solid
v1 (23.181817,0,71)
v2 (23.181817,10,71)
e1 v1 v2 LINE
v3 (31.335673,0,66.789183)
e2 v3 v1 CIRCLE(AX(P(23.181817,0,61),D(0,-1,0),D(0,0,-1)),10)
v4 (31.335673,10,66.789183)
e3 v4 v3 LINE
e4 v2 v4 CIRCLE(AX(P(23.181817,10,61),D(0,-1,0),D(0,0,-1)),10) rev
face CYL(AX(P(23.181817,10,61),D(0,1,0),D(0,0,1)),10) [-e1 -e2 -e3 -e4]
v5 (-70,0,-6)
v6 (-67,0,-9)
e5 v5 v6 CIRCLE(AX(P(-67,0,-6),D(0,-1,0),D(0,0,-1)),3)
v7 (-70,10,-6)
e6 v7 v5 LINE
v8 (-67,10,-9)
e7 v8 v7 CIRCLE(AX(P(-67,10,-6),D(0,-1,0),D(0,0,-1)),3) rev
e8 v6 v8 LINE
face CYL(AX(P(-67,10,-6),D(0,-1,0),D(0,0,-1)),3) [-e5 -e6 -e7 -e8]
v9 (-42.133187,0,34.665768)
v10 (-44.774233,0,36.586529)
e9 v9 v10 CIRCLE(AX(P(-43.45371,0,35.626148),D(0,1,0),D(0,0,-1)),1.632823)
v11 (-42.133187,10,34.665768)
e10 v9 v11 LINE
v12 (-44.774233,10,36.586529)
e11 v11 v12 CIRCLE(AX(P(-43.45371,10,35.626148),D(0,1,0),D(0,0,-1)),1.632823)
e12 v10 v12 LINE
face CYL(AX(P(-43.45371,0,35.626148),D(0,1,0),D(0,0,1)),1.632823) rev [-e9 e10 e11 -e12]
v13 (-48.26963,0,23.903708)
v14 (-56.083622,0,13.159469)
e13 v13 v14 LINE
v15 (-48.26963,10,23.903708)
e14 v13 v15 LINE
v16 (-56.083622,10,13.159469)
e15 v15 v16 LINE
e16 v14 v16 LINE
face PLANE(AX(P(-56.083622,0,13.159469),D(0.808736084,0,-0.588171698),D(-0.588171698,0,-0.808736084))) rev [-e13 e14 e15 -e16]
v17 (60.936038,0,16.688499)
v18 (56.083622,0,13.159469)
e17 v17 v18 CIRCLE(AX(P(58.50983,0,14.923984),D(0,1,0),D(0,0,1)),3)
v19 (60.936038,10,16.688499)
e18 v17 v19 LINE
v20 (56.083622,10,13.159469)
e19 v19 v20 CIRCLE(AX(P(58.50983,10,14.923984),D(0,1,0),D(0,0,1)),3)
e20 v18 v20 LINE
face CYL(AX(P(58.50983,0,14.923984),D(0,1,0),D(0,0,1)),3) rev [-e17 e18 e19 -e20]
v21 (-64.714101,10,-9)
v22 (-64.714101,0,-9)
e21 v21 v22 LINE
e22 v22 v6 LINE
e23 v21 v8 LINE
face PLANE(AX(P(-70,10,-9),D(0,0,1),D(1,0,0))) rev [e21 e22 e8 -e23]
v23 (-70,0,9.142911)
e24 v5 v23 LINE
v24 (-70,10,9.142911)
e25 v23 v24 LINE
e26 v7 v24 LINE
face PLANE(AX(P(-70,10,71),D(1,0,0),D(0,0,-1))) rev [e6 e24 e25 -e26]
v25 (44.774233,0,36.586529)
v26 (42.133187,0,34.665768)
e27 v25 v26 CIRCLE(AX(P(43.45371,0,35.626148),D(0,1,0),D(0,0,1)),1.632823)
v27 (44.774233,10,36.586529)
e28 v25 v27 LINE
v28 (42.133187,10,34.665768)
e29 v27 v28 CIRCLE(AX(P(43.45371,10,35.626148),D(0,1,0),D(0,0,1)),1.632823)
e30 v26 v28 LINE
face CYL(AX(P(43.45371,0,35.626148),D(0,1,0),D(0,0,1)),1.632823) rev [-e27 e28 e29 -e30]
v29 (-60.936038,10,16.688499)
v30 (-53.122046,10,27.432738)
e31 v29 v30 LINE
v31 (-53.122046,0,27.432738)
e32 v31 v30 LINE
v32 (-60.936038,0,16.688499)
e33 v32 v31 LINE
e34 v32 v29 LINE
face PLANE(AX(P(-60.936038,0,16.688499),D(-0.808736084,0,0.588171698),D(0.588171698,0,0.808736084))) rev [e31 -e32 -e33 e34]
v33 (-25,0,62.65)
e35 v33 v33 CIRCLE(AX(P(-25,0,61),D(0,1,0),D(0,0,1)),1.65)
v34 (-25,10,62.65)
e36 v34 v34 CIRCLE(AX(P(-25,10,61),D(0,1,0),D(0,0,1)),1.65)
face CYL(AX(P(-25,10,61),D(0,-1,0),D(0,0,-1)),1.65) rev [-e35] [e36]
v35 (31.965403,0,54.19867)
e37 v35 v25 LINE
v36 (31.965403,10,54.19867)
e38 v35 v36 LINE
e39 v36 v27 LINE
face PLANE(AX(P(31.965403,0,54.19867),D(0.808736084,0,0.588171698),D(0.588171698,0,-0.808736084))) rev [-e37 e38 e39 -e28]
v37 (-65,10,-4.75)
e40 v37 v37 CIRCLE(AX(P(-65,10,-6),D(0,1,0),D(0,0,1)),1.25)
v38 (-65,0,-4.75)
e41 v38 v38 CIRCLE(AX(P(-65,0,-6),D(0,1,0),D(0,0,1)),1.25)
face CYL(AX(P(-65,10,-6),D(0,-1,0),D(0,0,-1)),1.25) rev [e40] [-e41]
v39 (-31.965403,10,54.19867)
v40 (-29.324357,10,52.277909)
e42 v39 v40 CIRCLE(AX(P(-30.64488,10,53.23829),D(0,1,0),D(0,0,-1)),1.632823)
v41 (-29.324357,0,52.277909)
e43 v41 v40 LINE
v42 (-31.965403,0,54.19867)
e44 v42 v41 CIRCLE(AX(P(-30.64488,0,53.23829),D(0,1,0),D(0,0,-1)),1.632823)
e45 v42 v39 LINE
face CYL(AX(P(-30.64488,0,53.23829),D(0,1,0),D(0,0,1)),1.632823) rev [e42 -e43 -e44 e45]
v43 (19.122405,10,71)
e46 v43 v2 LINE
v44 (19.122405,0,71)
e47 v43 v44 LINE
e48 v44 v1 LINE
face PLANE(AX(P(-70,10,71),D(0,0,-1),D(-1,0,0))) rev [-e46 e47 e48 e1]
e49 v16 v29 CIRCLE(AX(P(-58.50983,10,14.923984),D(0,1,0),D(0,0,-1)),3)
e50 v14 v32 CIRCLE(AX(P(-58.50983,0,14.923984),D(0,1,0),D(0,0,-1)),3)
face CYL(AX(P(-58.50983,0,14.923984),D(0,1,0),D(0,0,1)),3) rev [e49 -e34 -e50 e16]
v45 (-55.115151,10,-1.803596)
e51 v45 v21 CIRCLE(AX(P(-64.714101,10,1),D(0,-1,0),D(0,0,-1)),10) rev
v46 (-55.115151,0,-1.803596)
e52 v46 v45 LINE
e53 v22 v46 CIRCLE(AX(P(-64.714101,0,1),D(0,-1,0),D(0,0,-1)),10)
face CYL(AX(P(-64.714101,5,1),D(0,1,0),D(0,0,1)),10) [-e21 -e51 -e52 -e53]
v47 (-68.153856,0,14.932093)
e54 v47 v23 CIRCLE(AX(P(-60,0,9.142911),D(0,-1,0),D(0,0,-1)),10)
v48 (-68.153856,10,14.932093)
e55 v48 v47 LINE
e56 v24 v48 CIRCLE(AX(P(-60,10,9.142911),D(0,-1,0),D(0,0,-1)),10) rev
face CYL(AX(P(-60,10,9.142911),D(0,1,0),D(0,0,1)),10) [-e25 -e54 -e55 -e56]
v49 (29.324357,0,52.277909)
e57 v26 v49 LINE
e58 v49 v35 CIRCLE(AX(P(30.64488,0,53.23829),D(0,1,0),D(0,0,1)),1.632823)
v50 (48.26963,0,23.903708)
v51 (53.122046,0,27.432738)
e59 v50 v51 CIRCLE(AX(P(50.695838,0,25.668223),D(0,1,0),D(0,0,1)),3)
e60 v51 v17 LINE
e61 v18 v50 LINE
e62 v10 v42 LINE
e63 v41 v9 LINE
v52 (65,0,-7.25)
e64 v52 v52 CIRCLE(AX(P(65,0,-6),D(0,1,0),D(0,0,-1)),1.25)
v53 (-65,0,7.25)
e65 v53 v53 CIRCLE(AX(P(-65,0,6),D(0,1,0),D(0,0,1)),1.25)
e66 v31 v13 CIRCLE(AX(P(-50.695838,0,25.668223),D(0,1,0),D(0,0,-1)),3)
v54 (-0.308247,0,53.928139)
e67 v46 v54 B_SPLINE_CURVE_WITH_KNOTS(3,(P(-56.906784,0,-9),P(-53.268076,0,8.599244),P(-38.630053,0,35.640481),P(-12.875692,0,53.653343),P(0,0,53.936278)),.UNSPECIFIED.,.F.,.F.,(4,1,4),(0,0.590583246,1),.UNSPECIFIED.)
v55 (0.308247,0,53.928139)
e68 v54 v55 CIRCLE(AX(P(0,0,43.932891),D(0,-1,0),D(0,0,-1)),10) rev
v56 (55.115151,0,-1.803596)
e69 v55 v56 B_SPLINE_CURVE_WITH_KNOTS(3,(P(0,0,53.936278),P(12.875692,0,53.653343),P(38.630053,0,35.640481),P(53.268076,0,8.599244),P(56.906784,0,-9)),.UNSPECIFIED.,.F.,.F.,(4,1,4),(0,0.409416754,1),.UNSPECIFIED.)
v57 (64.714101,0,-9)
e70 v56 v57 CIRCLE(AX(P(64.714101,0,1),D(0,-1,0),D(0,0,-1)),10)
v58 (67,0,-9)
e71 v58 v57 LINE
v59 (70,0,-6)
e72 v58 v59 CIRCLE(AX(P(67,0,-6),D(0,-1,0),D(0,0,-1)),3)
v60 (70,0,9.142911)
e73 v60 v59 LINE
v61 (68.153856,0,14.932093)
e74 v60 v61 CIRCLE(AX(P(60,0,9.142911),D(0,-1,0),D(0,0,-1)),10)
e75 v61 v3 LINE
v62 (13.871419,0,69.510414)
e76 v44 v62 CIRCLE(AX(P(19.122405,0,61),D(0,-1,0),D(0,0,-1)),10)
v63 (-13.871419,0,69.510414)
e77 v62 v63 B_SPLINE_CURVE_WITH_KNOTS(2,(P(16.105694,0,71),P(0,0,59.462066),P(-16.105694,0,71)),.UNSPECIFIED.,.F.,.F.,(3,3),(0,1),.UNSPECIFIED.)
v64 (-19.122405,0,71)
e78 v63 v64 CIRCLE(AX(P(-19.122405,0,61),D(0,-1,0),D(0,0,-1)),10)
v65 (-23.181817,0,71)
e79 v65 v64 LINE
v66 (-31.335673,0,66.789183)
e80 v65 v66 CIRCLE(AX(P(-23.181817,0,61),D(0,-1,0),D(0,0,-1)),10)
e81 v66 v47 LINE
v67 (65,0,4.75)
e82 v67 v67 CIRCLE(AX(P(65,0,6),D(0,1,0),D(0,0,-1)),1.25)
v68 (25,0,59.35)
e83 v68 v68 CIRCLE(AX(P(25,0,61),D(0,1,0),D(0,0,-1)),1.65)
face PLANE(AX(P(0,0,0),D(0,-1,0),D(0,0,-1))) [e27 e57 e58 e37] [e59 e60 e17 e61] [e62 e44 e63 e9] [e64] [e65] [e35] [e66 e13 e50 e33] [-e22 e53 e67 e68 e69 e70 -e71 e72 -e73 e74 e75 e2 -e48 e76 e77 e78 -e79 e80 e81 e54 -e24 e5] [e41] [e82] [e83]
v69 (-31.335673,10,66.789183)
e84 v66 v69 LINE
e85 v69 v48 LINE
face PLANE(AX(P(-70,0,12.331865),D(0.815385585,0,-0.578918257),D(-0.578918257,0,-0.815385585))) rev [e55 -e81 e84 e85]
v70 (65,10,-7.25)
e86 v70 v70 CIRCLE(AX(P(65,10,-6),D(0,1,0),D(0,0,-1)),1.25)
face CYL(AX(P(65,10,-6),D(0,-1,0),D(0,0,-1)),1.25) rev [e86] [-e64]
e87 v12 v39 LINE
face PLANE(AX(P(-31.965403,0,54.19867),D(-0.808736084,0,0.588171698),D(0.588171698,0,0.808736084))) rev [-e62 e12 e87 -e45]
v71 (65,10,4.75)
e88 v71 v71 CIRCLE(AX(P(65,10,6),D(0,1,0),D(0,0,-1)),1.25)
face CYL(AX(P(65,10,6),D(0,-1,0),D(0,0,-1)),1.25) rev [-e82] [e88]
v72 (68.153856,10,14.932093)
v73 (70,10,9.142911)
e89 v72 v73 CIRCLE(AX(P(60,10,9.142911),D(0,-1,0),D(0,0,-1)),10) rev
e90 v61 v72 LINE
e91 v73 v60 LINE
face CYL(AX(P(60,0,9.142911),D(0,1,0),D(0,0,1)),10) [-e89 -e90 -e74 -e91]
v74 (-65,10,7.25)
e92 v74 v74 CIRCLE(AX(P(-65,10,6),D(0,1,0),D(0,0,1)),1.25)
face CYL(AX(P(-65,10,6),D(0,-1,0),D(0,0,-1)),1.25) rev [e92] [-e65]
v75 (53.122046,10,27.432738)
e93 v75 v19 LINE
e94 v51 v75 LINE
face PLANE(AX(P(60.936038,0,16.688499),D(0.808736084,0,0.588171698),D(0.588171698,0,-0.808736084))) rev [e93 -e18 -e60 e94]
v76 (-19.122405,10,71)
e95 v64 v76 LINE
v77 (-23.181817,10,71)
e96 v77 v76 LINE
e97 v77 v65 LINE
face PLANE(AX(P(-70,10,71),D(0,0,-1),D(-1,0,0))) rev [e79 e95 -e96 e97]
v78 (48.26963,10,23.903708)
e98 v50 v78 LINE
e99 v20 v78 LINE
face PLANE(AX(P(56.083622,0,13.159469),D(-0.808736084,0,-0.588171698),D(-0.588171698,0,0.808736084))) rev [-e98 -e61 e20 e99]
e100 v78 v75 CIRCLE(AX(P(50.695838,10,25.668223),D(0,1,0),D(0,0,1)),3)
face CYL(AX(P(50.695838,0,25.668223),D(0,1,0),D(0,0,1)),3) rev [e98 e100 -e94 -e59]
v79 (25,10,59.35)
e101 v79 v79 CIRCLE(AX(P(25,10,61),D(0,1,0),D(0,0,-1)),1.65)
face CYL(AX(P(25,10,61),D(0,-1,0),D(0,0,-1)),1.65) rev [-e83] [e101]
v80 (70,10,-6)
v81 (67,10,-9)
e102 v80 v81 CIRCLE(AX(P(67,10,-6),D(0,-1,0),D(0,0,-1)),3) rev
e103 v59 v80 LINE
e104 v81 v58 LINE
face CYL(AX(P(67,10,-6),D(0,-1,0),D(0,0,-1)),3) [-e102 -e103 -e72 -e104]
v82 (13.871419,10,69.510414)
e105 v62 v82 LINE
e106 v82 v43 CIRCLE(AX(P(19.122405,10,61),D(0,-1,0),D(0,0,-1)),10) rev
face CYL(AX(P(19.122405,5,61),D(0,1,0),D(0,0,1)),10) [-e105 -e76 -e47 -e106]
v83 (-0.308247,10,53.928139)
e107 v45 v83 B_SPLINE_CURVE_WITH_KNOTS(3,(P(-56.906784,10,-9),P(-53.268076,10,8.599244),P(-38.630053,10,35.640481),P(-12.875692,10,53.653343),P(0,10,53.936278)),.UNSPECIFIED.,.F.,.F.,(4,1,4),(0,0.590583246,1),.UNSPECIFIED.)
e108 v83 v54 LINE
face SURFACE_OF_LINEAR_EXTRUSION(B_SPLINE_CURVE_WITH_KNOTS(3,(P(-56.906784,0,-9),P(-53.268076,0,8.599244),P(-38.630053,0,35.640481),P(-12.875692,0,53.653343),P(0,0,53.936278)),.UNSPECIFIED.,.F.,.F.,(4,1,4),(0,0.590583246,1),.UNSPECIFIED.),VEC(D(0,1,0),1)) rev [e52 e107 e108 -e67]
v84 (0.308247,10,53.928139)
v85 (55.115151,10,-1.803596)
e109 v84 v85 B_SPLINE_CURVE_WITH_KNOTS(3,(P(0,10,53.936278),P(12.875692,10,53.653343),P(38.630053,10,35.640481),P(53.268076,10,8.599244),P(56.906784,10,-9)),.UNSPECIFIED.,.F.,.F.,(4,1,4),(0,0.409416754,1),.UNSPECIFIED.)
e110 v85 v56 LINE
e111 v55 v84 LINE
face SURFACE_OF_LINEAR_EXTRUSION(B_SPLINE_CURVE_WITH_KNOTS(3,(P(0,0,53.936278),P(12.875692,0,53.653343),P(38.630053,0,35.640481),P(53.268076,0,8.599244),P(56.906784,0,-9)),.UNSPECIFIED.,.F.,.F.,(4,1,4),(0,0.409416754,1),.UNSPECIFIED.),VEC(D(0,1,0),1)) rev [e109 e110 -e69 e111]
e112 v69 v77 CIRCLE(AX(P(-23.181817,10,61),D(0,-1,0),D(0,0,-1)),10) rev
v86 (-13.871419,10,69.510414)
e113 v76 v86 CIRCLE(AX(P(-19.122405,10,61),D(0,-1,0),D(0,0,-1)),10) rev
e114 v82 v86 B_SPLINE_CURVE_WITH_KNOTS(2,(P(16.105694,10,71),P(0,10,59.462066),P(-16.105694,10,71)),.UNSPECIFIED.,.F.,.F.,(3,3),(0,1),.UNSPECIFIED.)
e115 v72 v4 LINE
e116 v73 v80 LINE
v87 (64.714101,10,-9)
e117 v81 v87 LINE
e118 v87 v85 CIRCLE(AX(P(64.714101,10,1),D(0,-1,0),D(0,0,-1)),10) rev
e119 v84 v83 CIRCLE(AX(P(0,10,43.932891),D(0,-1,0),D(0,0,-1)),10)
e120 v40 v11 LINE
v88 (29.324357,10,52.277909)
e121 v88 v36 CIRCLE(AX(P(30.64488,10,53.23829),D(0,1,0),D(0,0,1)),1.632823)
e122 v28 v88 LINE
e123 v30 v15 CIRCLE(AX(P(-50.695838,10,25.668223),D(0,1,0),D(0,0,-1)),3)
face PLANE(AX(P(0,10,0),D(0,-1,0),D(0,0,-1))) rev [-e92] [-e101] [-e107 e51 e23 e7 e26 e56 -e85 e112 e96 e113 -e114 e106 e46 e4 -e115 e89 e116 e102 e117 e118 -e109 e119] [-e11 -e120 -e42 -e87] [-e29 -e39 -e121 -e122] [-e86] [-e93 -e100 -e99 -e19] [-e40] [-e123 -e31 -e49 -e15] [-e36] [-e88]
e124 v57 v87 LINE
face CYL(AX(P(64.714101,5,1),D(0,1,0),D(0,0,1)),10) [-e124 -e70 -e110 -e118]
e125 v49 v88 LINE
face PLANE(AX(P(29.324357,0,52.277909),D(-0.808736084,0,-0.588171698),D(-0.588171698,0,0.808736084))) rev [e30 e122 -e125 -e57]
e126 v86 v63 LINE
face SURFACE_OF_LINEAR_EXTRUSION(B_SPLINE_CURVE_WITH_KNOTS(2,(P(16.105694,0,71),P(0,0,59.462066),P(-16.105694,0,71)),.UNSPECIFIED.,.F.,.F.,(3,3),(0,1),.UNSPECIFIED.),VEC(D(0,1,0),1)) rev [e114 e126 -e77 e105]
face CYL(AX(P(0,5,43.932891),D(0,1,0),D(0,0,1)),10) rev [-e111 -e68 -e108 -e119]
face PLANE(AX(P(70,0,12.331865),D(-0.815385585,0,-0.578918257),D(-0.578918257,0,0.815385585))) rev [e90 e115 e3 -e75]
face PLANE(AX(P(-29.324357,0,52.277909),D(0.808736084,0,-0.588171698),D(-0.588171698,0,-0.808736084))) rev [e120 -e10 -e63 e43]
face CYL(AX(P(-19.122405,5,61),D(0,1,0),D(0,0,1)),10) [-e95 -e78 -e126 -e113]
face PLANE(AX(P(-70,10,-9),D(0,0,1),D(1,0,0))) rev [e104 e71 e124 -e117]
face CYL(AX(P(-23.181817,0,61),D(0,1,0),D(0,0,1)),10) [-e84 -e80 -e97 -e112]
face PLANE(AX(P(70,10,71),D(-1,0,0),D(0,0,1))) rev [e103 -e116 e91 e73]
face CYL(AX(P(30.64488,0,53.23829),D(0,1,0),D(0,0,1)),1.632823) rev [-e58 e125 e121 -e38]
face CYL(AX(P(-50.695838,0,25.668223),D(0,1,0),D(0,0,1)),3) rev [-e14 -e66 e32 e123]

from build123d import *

# Parameters (mm, degrees)
SKETCH_1_W          = 140
SKETCH_1_H          = 80
SKETCH_1_R          = 1.25
SKETCH_1_R_2        = 1.65
EXTRUDE_1_DEPTH     = 10
CUT_EXTRUDE_1_DEPTH = 101.204790305
FILLET_1_R          = 10
FILLET_2_R          = 3
CUT_EXTRUDE_2_DEPTH = 101.204790455


with BuildPart() as part:
    # 草图1 → 凸台-拉伸1 (new body)
    with BuildSketch(Plane(origin=(0, 0, 0), x_dir=(1, 0, 0), z_dir=(0, 1, 0))):
        with Locations((0, -31)):
            Rectangle(SKETCH_1_W, SKETCH_1_H)
        with Locations(Location((-65, 6, 0), (0, 0, 270))):
            Circle(SKETCH_1_R, mode=Mode.SUBTRACT)
        with Locations(Location((-65, -6, 0), (0, 0, 270))):
            Circle(SKETCH_1_R, mode=Mode.SUBTRACT)
        with Locations(Location((65, -6, 0), (0, 0, 90))):
            Circle(SKETCH_1_R, mode=Mode.SUBTRACT)
        with Locations(Location((65, 6, 0), (0, 0, 90))):
            Circle(SKETCH_1_R, mode=Mode.SUBTRACT)
        with Locations(Location((-25, -61, 0), (0, 0, 270))):
            Circle(SKETCH_1_R_2, mode=Mode.SUBTRACT)
        with Locations(Location((25, -61, 0), (0, 0, 90))):
            Circle(SKETCH_1_R_2, mode=Mode.SUBTRACT)
    extrude(amount=EXTRUDE_1_DEPTH)

    # 草图2 → 切除-拉伸1 (cut, through all)
    with BuildSketch(Plane(origin=(0, 10, 0), x_dir=(1, 0, 0), z_dir=(0, 1, 0))):
        Polygon((-70, -12.331865366), (-28.346020761, -71), (-70, -71), align=None)
        Polygon((70, -12.331865366), (28.346020761, -71), (70, -71), align=None)
        with BuildLine():
            Line((-16.105693614, -71), (16.105693614, -71))
            add(Edge.make_bspline(
                [(-16.105693614, -71), (0, -59.46206609), (16.105693614, -71)],
                knots=[0, 0, 0, 1, 1, 1], degree=2))
        make_face()
        with BuildLine():
            Line((56.906784104, 9), (-56.906784104, 9))
            add(Edge.make_bspline(
                [(-56.906784104, 9), (-53.268076424, -8.599244087), (-38.630052836, -35.640481439), (-12.875691634, -53.653343186), (0, -53.936278292)],
                knots=[0, 0, 0, 0, 0.590583246, 1, 1, 1, 1], degree=3))
            add(Edge.make_bspline(
                [(56.906784104, 9), (53.268076424, -8.599244087), (38.630052836, -35.640481439), (12.875691634, -53.653343186), (0, -53.936278292)],
                knots=[0, 0, 0, 0, 0.590583246, 1, 1, 1, 1], degree=3))
        make_face()
    extrude(amount=-CUT_EXTRUDE_1_DEPTH, mode=Mode.SUBTRACT)

    # 圆角1
    # the kernel refuses this fillet: 10 mm, written as the material it adds along each edge
    with BuildSketch(Plane(origin=(0, 10, 53.936278292), x_dir=(-0.999651568741567, 0, -0.026395854078324985), z_dir=(0, -1, 0))) as fillet_1_piece_1:
        with BuildLine():
            CenterArc((0.264047953, 9.999901848), FILLET_1_R, 266.721049901, 3.532806773)
            Line((-0.307924469, 0.016272871), (-0.319363918, -0.183399709))
            ThreePointArc((-0.319363918, -0.183399709), (-0.16453479, -0.191925855), (-0.009670177, -0.199766082))
            Line((-0.009670177, -0.199766082), (-0.000885616, -0.199998039))
            ThreePointArc((-0.000885616, -0.199998039), (0.15417695, -0.200341456), (0.30924028, -0.199998037))
            Line((0.30924028, -0.199998037), (0.308354155, 0))
        make_face()
    extrude(amount=10)
    # the kernel refuses this fillet: 10 mm, written as the material it takes off along each edge
    with BuildSketch(Plane(origin=(-70, 10, 12.331865366), x_dir=(0.5789182566890616, 0, 0.8153855849057535), z_dir=(0, -1, 0)), Plane(origin=(70, 10, 12.331865366), x_dir=(0, 0, -1), z_dir=(0, -1, 0))) as fillet_1_2_piece_1:
        with BuildLine():
            CenterArc((FILLET_1_R * 0.318895479562, -FILLET_1_R), FILLET_1_R, 90, 35.374494493)
            Line((-FILLET_1_R * 0.260022777127, -FILLET_1_R * 0.184614415094), (-FILLET_1_R * 0.271601142261, -FILLET_1_R * 0.168306703396))
            Line((-FILLET_1_R * 0.271601142261, -FILLET_1_R * 0.168306703396), (-FILLET_1_R * 0.00637790959125, FILLET_1_R * 0.02))
            Line((-FILLET_1_R * 0.00637790959125, FILLET_1_R * 0.02), (FILLET_1_R * 0.318895479562, FILLET_1_R * 0.02))
            Line((FILLET_1_R * 0.318895479562, FILLET_1_R * 0.02), (FILLET_1_R * 0.318895479562, 0))
        make_face()
    extrude(amount=10, mode=Mode.SUBTRACT)
    with BuildSketch(Plane(origin=(-56.906784104, 10, -9), x_dir=(-1, 0, 0), z_dir=(0, -1, 0))) as fillet_1_2_piece_2:
        with BuildLine():
            CenterArc((7.807317394, -10), FILLET_1_R, 90, 73.718330192)
            Line((-1.79163295, -7.196403685), (-1.983611957, -7.140331758))
            ThreePointArc((-1.983611957, -7.140331758), (-1.017653275, -3.56787057), (-0.195857636, 0.040494278))
            Line((-0.195857636, 0.040494278), (0, 0.2))
            Line((0, 0.2), (7.807317394, 0.2))
            Line((7.807317394, 0.2), (7.807317394, 0))
        make_face()
    extrude(amount=10, mode=Mode.SUBTRACT)
    with BuildSketch(Plane(origin=(56.906784104, 10, -9), x_dir=(-0.2415877467248244, 0, 0.9703789778392884), z_dir=(0, -1, 0))) as fillet_1_2_piece_3:
        with BuildLine():
            CenterArc((7.817637561, -9.991934139), FILLET_1_R, 92.301400389, 73.718330192)
            Line((-1.886152217, -7.576056672), (-2.080228013, -7.527739123))
            Line((-2.080228013, -7.527739123), (-0.194075796, 0.048317549))
            Line((-0.194075796, 0.048317549), (0.008022009, 0.199839054))
            ThreePointArc((0.008022009, 0.199839054), (3.708039158, 0.125555533), (7.408044176, 0.199838683))
            Line((7.408044176, 0.199838683), (7.416075419, 0))
        make_face()
    extrude(amount=10, mode=Mode.SUBTRACT)
    with BuildSketch(Plane(origin=(-28.346020761, 10, 71), x_dir=(1, 0, 0), z_dir=(0, -1, 0)), Plane(origin=(28.346020761, 10, 71), x_dir=(0.5789182566890612, 0, -0.8153855849057537), z_dir=(0, -1, 0))) as fillet_1_2_piece_4:
        with BuildLine():
            CenterArc((FILLET_1_R * 0.516420391905, -FILLET_1_R), FILLET_1_R, 90, 54.625505507)
            Line((-FILLET_1_R * 0.298965193, -FILLET_1_R * 0.421081743311), (-FILLET_1_R * 0.315272904699, -FILLET_1_R * 0.409503378177))
            Line((-FILLET_1_R * 0.315272904699, -FILLET_1_R * 0.409503378177), (-FILLET_1_R * 0.0103284078381, FILLET_1_R * 0.02))
            Line((-FILLET_1_R * 0.0103284078381, FILLET_1_R * 0.02), (FILLET_1_R * 0.516420391905, FILLET_1_R * 0.02))
            Line((FILLET_1_R * 0.516420391905, FILLET_1_R * 0.02), (FILLET_1_R * 0.516420391905, 0))
        make_face()
    extrude(amount=10, mode=Mode.SUBTRACT)
    with BuildSketch(Plane(origin=(-16.105693614, 10, 71), x_dir=(-1, 0, 0), z_dir=(0, -1, 0))) as fillet_1_2_piece_5:
        with BuildLine():
            CenterArc((3.016711089, 10), FILLET_1_R, 238.325124011, 31.674875989)
            Line((-2.234274138, 1.489585548), (-2.339293843, 1.319377259))
            ThreePointArc((-2.339293843, 1.319377259), (-1.215329893, 0.597636236), (-0.116473908, -0.162584835))
            Line((-0.116473908, -0.162584835), (0, -0.2))
            Line((0, -0.2), (3.016711089, -0.2))
            Line((3.016711089, -0.2), (3.016711089, 0))
        make_face()
    extrude(amount=10, mode=Mode.SUBTRACT)
    with BuildSketch(Plane(origin=(16.105693614, 10, 71), x_dir=(-0.8320383563974485, 0, -0.554718102718338), z_dir=(0, -1, 0))) as fillet_1_2_piece_6:
        with BuildLine():
            CenterArc((3.037161691, 9.993807815), FILLET_1_R, 236.308699407, 31.674875989)
            Line((-2.510019336, 1.673424251), (-2.620962956, 1.50701658))
            Line((-2.620962956, 1.50701658), (-0.110943621, -0.166407671))
            Line((-0.110943621, -0.166407671), (0.006722008, -0.199887005))
            ThreePointArc((0.006722008, -0.199887005), (1.342720726, -0.176909221), (2.678264654, -0.199876156))
            Line((2.678264654, -0.199876156), (2.685301851, 0))
        make_face()
    extrude(amount=10, mode=Mode.SUBTRACT)

    # 圆角2
    fillet_2_edges = [part.edges().sort_by_distance(p)[0] for p in [
        (-70, 5, -9),
        (70, 5, -9),
    ]]
    fillet(fillet_2_edges, radius=FILLET_2_R)

    # 草图3 → 切除-拉伸2 (cut, through all)
    with BuildSketch(Plane(origin=(0, 10, 0), x_dir=(1, 0, 0), z_dir=(0, 1, 0))):
        with BuildLine():
            Line((29.324357242, -52.277909179), (42.133187381, -34.665767738))
            ThreePointArc((42.133187381, -34.665767738), (44.414090847, -34.305625086), (44.774233499, -36.586528552))
            Line((44.774233499, -36.586528552), (31.965403361, -54.198669993))
            ThreePointArc((31.965403361, -54.198669993), (29.684499894, -54.558812645), (29.324357242, -52.277909179))
        make_face()
        with BuildLine():
            Line((60.93603818, -16.688498943), (53.122046102, -27.432738051))
            ThreePointArc((53.122046102, -27.432738051), (48.931322756, -28.09443121), (48.269629596, -23.903707865))
            Line((48.269629596, -23.903707865), (56.083621674, -13.159468757))
            ThreePointArc((56.083621674, -13.159468757), (60.27434502, -12.497775597), (60.93603818, -16.688498943))
        make_face()
        with BuildLine():
            Line((-60.93603818, -16.688498943), (-53.122046102, -27.432738051))
            ThreePointArc((-53.122046102, -27.432738051), (-48.931322756, -28.09443121), (-48.269629596, -23.903707865))
            Line((-48.269629596, -23.903707865), (-56.083621674, -13.159468757))
            ThreePointArc((-56.083621674, -13.159468757), (-60.27434502, -12.497775597), (-60.93603818, -16.688498943))
        make_face()
        with BuildLine():
            Line((-29.324357242, -52.277909179), (-42.133187381, -34.665767738))
            ThreePointArc((-42.133187381, -34.665767738), (-44.414090847, -34.305625086), (-44.774233499, -36.586528552))
            Line((-44.774233499, -36.586528552), (-31.965403361, -54.198669993))
            ThreePointArc((-31.965403361, -54.198669993), (-29.684499894, -54.558812645), (-29.324357242, -52.277909179))
        make_face()
    extrude(amount=-CUT_EXTRUDE_2_DEPTH, mode=Mode.SUBTRACT)


solid = part.part
